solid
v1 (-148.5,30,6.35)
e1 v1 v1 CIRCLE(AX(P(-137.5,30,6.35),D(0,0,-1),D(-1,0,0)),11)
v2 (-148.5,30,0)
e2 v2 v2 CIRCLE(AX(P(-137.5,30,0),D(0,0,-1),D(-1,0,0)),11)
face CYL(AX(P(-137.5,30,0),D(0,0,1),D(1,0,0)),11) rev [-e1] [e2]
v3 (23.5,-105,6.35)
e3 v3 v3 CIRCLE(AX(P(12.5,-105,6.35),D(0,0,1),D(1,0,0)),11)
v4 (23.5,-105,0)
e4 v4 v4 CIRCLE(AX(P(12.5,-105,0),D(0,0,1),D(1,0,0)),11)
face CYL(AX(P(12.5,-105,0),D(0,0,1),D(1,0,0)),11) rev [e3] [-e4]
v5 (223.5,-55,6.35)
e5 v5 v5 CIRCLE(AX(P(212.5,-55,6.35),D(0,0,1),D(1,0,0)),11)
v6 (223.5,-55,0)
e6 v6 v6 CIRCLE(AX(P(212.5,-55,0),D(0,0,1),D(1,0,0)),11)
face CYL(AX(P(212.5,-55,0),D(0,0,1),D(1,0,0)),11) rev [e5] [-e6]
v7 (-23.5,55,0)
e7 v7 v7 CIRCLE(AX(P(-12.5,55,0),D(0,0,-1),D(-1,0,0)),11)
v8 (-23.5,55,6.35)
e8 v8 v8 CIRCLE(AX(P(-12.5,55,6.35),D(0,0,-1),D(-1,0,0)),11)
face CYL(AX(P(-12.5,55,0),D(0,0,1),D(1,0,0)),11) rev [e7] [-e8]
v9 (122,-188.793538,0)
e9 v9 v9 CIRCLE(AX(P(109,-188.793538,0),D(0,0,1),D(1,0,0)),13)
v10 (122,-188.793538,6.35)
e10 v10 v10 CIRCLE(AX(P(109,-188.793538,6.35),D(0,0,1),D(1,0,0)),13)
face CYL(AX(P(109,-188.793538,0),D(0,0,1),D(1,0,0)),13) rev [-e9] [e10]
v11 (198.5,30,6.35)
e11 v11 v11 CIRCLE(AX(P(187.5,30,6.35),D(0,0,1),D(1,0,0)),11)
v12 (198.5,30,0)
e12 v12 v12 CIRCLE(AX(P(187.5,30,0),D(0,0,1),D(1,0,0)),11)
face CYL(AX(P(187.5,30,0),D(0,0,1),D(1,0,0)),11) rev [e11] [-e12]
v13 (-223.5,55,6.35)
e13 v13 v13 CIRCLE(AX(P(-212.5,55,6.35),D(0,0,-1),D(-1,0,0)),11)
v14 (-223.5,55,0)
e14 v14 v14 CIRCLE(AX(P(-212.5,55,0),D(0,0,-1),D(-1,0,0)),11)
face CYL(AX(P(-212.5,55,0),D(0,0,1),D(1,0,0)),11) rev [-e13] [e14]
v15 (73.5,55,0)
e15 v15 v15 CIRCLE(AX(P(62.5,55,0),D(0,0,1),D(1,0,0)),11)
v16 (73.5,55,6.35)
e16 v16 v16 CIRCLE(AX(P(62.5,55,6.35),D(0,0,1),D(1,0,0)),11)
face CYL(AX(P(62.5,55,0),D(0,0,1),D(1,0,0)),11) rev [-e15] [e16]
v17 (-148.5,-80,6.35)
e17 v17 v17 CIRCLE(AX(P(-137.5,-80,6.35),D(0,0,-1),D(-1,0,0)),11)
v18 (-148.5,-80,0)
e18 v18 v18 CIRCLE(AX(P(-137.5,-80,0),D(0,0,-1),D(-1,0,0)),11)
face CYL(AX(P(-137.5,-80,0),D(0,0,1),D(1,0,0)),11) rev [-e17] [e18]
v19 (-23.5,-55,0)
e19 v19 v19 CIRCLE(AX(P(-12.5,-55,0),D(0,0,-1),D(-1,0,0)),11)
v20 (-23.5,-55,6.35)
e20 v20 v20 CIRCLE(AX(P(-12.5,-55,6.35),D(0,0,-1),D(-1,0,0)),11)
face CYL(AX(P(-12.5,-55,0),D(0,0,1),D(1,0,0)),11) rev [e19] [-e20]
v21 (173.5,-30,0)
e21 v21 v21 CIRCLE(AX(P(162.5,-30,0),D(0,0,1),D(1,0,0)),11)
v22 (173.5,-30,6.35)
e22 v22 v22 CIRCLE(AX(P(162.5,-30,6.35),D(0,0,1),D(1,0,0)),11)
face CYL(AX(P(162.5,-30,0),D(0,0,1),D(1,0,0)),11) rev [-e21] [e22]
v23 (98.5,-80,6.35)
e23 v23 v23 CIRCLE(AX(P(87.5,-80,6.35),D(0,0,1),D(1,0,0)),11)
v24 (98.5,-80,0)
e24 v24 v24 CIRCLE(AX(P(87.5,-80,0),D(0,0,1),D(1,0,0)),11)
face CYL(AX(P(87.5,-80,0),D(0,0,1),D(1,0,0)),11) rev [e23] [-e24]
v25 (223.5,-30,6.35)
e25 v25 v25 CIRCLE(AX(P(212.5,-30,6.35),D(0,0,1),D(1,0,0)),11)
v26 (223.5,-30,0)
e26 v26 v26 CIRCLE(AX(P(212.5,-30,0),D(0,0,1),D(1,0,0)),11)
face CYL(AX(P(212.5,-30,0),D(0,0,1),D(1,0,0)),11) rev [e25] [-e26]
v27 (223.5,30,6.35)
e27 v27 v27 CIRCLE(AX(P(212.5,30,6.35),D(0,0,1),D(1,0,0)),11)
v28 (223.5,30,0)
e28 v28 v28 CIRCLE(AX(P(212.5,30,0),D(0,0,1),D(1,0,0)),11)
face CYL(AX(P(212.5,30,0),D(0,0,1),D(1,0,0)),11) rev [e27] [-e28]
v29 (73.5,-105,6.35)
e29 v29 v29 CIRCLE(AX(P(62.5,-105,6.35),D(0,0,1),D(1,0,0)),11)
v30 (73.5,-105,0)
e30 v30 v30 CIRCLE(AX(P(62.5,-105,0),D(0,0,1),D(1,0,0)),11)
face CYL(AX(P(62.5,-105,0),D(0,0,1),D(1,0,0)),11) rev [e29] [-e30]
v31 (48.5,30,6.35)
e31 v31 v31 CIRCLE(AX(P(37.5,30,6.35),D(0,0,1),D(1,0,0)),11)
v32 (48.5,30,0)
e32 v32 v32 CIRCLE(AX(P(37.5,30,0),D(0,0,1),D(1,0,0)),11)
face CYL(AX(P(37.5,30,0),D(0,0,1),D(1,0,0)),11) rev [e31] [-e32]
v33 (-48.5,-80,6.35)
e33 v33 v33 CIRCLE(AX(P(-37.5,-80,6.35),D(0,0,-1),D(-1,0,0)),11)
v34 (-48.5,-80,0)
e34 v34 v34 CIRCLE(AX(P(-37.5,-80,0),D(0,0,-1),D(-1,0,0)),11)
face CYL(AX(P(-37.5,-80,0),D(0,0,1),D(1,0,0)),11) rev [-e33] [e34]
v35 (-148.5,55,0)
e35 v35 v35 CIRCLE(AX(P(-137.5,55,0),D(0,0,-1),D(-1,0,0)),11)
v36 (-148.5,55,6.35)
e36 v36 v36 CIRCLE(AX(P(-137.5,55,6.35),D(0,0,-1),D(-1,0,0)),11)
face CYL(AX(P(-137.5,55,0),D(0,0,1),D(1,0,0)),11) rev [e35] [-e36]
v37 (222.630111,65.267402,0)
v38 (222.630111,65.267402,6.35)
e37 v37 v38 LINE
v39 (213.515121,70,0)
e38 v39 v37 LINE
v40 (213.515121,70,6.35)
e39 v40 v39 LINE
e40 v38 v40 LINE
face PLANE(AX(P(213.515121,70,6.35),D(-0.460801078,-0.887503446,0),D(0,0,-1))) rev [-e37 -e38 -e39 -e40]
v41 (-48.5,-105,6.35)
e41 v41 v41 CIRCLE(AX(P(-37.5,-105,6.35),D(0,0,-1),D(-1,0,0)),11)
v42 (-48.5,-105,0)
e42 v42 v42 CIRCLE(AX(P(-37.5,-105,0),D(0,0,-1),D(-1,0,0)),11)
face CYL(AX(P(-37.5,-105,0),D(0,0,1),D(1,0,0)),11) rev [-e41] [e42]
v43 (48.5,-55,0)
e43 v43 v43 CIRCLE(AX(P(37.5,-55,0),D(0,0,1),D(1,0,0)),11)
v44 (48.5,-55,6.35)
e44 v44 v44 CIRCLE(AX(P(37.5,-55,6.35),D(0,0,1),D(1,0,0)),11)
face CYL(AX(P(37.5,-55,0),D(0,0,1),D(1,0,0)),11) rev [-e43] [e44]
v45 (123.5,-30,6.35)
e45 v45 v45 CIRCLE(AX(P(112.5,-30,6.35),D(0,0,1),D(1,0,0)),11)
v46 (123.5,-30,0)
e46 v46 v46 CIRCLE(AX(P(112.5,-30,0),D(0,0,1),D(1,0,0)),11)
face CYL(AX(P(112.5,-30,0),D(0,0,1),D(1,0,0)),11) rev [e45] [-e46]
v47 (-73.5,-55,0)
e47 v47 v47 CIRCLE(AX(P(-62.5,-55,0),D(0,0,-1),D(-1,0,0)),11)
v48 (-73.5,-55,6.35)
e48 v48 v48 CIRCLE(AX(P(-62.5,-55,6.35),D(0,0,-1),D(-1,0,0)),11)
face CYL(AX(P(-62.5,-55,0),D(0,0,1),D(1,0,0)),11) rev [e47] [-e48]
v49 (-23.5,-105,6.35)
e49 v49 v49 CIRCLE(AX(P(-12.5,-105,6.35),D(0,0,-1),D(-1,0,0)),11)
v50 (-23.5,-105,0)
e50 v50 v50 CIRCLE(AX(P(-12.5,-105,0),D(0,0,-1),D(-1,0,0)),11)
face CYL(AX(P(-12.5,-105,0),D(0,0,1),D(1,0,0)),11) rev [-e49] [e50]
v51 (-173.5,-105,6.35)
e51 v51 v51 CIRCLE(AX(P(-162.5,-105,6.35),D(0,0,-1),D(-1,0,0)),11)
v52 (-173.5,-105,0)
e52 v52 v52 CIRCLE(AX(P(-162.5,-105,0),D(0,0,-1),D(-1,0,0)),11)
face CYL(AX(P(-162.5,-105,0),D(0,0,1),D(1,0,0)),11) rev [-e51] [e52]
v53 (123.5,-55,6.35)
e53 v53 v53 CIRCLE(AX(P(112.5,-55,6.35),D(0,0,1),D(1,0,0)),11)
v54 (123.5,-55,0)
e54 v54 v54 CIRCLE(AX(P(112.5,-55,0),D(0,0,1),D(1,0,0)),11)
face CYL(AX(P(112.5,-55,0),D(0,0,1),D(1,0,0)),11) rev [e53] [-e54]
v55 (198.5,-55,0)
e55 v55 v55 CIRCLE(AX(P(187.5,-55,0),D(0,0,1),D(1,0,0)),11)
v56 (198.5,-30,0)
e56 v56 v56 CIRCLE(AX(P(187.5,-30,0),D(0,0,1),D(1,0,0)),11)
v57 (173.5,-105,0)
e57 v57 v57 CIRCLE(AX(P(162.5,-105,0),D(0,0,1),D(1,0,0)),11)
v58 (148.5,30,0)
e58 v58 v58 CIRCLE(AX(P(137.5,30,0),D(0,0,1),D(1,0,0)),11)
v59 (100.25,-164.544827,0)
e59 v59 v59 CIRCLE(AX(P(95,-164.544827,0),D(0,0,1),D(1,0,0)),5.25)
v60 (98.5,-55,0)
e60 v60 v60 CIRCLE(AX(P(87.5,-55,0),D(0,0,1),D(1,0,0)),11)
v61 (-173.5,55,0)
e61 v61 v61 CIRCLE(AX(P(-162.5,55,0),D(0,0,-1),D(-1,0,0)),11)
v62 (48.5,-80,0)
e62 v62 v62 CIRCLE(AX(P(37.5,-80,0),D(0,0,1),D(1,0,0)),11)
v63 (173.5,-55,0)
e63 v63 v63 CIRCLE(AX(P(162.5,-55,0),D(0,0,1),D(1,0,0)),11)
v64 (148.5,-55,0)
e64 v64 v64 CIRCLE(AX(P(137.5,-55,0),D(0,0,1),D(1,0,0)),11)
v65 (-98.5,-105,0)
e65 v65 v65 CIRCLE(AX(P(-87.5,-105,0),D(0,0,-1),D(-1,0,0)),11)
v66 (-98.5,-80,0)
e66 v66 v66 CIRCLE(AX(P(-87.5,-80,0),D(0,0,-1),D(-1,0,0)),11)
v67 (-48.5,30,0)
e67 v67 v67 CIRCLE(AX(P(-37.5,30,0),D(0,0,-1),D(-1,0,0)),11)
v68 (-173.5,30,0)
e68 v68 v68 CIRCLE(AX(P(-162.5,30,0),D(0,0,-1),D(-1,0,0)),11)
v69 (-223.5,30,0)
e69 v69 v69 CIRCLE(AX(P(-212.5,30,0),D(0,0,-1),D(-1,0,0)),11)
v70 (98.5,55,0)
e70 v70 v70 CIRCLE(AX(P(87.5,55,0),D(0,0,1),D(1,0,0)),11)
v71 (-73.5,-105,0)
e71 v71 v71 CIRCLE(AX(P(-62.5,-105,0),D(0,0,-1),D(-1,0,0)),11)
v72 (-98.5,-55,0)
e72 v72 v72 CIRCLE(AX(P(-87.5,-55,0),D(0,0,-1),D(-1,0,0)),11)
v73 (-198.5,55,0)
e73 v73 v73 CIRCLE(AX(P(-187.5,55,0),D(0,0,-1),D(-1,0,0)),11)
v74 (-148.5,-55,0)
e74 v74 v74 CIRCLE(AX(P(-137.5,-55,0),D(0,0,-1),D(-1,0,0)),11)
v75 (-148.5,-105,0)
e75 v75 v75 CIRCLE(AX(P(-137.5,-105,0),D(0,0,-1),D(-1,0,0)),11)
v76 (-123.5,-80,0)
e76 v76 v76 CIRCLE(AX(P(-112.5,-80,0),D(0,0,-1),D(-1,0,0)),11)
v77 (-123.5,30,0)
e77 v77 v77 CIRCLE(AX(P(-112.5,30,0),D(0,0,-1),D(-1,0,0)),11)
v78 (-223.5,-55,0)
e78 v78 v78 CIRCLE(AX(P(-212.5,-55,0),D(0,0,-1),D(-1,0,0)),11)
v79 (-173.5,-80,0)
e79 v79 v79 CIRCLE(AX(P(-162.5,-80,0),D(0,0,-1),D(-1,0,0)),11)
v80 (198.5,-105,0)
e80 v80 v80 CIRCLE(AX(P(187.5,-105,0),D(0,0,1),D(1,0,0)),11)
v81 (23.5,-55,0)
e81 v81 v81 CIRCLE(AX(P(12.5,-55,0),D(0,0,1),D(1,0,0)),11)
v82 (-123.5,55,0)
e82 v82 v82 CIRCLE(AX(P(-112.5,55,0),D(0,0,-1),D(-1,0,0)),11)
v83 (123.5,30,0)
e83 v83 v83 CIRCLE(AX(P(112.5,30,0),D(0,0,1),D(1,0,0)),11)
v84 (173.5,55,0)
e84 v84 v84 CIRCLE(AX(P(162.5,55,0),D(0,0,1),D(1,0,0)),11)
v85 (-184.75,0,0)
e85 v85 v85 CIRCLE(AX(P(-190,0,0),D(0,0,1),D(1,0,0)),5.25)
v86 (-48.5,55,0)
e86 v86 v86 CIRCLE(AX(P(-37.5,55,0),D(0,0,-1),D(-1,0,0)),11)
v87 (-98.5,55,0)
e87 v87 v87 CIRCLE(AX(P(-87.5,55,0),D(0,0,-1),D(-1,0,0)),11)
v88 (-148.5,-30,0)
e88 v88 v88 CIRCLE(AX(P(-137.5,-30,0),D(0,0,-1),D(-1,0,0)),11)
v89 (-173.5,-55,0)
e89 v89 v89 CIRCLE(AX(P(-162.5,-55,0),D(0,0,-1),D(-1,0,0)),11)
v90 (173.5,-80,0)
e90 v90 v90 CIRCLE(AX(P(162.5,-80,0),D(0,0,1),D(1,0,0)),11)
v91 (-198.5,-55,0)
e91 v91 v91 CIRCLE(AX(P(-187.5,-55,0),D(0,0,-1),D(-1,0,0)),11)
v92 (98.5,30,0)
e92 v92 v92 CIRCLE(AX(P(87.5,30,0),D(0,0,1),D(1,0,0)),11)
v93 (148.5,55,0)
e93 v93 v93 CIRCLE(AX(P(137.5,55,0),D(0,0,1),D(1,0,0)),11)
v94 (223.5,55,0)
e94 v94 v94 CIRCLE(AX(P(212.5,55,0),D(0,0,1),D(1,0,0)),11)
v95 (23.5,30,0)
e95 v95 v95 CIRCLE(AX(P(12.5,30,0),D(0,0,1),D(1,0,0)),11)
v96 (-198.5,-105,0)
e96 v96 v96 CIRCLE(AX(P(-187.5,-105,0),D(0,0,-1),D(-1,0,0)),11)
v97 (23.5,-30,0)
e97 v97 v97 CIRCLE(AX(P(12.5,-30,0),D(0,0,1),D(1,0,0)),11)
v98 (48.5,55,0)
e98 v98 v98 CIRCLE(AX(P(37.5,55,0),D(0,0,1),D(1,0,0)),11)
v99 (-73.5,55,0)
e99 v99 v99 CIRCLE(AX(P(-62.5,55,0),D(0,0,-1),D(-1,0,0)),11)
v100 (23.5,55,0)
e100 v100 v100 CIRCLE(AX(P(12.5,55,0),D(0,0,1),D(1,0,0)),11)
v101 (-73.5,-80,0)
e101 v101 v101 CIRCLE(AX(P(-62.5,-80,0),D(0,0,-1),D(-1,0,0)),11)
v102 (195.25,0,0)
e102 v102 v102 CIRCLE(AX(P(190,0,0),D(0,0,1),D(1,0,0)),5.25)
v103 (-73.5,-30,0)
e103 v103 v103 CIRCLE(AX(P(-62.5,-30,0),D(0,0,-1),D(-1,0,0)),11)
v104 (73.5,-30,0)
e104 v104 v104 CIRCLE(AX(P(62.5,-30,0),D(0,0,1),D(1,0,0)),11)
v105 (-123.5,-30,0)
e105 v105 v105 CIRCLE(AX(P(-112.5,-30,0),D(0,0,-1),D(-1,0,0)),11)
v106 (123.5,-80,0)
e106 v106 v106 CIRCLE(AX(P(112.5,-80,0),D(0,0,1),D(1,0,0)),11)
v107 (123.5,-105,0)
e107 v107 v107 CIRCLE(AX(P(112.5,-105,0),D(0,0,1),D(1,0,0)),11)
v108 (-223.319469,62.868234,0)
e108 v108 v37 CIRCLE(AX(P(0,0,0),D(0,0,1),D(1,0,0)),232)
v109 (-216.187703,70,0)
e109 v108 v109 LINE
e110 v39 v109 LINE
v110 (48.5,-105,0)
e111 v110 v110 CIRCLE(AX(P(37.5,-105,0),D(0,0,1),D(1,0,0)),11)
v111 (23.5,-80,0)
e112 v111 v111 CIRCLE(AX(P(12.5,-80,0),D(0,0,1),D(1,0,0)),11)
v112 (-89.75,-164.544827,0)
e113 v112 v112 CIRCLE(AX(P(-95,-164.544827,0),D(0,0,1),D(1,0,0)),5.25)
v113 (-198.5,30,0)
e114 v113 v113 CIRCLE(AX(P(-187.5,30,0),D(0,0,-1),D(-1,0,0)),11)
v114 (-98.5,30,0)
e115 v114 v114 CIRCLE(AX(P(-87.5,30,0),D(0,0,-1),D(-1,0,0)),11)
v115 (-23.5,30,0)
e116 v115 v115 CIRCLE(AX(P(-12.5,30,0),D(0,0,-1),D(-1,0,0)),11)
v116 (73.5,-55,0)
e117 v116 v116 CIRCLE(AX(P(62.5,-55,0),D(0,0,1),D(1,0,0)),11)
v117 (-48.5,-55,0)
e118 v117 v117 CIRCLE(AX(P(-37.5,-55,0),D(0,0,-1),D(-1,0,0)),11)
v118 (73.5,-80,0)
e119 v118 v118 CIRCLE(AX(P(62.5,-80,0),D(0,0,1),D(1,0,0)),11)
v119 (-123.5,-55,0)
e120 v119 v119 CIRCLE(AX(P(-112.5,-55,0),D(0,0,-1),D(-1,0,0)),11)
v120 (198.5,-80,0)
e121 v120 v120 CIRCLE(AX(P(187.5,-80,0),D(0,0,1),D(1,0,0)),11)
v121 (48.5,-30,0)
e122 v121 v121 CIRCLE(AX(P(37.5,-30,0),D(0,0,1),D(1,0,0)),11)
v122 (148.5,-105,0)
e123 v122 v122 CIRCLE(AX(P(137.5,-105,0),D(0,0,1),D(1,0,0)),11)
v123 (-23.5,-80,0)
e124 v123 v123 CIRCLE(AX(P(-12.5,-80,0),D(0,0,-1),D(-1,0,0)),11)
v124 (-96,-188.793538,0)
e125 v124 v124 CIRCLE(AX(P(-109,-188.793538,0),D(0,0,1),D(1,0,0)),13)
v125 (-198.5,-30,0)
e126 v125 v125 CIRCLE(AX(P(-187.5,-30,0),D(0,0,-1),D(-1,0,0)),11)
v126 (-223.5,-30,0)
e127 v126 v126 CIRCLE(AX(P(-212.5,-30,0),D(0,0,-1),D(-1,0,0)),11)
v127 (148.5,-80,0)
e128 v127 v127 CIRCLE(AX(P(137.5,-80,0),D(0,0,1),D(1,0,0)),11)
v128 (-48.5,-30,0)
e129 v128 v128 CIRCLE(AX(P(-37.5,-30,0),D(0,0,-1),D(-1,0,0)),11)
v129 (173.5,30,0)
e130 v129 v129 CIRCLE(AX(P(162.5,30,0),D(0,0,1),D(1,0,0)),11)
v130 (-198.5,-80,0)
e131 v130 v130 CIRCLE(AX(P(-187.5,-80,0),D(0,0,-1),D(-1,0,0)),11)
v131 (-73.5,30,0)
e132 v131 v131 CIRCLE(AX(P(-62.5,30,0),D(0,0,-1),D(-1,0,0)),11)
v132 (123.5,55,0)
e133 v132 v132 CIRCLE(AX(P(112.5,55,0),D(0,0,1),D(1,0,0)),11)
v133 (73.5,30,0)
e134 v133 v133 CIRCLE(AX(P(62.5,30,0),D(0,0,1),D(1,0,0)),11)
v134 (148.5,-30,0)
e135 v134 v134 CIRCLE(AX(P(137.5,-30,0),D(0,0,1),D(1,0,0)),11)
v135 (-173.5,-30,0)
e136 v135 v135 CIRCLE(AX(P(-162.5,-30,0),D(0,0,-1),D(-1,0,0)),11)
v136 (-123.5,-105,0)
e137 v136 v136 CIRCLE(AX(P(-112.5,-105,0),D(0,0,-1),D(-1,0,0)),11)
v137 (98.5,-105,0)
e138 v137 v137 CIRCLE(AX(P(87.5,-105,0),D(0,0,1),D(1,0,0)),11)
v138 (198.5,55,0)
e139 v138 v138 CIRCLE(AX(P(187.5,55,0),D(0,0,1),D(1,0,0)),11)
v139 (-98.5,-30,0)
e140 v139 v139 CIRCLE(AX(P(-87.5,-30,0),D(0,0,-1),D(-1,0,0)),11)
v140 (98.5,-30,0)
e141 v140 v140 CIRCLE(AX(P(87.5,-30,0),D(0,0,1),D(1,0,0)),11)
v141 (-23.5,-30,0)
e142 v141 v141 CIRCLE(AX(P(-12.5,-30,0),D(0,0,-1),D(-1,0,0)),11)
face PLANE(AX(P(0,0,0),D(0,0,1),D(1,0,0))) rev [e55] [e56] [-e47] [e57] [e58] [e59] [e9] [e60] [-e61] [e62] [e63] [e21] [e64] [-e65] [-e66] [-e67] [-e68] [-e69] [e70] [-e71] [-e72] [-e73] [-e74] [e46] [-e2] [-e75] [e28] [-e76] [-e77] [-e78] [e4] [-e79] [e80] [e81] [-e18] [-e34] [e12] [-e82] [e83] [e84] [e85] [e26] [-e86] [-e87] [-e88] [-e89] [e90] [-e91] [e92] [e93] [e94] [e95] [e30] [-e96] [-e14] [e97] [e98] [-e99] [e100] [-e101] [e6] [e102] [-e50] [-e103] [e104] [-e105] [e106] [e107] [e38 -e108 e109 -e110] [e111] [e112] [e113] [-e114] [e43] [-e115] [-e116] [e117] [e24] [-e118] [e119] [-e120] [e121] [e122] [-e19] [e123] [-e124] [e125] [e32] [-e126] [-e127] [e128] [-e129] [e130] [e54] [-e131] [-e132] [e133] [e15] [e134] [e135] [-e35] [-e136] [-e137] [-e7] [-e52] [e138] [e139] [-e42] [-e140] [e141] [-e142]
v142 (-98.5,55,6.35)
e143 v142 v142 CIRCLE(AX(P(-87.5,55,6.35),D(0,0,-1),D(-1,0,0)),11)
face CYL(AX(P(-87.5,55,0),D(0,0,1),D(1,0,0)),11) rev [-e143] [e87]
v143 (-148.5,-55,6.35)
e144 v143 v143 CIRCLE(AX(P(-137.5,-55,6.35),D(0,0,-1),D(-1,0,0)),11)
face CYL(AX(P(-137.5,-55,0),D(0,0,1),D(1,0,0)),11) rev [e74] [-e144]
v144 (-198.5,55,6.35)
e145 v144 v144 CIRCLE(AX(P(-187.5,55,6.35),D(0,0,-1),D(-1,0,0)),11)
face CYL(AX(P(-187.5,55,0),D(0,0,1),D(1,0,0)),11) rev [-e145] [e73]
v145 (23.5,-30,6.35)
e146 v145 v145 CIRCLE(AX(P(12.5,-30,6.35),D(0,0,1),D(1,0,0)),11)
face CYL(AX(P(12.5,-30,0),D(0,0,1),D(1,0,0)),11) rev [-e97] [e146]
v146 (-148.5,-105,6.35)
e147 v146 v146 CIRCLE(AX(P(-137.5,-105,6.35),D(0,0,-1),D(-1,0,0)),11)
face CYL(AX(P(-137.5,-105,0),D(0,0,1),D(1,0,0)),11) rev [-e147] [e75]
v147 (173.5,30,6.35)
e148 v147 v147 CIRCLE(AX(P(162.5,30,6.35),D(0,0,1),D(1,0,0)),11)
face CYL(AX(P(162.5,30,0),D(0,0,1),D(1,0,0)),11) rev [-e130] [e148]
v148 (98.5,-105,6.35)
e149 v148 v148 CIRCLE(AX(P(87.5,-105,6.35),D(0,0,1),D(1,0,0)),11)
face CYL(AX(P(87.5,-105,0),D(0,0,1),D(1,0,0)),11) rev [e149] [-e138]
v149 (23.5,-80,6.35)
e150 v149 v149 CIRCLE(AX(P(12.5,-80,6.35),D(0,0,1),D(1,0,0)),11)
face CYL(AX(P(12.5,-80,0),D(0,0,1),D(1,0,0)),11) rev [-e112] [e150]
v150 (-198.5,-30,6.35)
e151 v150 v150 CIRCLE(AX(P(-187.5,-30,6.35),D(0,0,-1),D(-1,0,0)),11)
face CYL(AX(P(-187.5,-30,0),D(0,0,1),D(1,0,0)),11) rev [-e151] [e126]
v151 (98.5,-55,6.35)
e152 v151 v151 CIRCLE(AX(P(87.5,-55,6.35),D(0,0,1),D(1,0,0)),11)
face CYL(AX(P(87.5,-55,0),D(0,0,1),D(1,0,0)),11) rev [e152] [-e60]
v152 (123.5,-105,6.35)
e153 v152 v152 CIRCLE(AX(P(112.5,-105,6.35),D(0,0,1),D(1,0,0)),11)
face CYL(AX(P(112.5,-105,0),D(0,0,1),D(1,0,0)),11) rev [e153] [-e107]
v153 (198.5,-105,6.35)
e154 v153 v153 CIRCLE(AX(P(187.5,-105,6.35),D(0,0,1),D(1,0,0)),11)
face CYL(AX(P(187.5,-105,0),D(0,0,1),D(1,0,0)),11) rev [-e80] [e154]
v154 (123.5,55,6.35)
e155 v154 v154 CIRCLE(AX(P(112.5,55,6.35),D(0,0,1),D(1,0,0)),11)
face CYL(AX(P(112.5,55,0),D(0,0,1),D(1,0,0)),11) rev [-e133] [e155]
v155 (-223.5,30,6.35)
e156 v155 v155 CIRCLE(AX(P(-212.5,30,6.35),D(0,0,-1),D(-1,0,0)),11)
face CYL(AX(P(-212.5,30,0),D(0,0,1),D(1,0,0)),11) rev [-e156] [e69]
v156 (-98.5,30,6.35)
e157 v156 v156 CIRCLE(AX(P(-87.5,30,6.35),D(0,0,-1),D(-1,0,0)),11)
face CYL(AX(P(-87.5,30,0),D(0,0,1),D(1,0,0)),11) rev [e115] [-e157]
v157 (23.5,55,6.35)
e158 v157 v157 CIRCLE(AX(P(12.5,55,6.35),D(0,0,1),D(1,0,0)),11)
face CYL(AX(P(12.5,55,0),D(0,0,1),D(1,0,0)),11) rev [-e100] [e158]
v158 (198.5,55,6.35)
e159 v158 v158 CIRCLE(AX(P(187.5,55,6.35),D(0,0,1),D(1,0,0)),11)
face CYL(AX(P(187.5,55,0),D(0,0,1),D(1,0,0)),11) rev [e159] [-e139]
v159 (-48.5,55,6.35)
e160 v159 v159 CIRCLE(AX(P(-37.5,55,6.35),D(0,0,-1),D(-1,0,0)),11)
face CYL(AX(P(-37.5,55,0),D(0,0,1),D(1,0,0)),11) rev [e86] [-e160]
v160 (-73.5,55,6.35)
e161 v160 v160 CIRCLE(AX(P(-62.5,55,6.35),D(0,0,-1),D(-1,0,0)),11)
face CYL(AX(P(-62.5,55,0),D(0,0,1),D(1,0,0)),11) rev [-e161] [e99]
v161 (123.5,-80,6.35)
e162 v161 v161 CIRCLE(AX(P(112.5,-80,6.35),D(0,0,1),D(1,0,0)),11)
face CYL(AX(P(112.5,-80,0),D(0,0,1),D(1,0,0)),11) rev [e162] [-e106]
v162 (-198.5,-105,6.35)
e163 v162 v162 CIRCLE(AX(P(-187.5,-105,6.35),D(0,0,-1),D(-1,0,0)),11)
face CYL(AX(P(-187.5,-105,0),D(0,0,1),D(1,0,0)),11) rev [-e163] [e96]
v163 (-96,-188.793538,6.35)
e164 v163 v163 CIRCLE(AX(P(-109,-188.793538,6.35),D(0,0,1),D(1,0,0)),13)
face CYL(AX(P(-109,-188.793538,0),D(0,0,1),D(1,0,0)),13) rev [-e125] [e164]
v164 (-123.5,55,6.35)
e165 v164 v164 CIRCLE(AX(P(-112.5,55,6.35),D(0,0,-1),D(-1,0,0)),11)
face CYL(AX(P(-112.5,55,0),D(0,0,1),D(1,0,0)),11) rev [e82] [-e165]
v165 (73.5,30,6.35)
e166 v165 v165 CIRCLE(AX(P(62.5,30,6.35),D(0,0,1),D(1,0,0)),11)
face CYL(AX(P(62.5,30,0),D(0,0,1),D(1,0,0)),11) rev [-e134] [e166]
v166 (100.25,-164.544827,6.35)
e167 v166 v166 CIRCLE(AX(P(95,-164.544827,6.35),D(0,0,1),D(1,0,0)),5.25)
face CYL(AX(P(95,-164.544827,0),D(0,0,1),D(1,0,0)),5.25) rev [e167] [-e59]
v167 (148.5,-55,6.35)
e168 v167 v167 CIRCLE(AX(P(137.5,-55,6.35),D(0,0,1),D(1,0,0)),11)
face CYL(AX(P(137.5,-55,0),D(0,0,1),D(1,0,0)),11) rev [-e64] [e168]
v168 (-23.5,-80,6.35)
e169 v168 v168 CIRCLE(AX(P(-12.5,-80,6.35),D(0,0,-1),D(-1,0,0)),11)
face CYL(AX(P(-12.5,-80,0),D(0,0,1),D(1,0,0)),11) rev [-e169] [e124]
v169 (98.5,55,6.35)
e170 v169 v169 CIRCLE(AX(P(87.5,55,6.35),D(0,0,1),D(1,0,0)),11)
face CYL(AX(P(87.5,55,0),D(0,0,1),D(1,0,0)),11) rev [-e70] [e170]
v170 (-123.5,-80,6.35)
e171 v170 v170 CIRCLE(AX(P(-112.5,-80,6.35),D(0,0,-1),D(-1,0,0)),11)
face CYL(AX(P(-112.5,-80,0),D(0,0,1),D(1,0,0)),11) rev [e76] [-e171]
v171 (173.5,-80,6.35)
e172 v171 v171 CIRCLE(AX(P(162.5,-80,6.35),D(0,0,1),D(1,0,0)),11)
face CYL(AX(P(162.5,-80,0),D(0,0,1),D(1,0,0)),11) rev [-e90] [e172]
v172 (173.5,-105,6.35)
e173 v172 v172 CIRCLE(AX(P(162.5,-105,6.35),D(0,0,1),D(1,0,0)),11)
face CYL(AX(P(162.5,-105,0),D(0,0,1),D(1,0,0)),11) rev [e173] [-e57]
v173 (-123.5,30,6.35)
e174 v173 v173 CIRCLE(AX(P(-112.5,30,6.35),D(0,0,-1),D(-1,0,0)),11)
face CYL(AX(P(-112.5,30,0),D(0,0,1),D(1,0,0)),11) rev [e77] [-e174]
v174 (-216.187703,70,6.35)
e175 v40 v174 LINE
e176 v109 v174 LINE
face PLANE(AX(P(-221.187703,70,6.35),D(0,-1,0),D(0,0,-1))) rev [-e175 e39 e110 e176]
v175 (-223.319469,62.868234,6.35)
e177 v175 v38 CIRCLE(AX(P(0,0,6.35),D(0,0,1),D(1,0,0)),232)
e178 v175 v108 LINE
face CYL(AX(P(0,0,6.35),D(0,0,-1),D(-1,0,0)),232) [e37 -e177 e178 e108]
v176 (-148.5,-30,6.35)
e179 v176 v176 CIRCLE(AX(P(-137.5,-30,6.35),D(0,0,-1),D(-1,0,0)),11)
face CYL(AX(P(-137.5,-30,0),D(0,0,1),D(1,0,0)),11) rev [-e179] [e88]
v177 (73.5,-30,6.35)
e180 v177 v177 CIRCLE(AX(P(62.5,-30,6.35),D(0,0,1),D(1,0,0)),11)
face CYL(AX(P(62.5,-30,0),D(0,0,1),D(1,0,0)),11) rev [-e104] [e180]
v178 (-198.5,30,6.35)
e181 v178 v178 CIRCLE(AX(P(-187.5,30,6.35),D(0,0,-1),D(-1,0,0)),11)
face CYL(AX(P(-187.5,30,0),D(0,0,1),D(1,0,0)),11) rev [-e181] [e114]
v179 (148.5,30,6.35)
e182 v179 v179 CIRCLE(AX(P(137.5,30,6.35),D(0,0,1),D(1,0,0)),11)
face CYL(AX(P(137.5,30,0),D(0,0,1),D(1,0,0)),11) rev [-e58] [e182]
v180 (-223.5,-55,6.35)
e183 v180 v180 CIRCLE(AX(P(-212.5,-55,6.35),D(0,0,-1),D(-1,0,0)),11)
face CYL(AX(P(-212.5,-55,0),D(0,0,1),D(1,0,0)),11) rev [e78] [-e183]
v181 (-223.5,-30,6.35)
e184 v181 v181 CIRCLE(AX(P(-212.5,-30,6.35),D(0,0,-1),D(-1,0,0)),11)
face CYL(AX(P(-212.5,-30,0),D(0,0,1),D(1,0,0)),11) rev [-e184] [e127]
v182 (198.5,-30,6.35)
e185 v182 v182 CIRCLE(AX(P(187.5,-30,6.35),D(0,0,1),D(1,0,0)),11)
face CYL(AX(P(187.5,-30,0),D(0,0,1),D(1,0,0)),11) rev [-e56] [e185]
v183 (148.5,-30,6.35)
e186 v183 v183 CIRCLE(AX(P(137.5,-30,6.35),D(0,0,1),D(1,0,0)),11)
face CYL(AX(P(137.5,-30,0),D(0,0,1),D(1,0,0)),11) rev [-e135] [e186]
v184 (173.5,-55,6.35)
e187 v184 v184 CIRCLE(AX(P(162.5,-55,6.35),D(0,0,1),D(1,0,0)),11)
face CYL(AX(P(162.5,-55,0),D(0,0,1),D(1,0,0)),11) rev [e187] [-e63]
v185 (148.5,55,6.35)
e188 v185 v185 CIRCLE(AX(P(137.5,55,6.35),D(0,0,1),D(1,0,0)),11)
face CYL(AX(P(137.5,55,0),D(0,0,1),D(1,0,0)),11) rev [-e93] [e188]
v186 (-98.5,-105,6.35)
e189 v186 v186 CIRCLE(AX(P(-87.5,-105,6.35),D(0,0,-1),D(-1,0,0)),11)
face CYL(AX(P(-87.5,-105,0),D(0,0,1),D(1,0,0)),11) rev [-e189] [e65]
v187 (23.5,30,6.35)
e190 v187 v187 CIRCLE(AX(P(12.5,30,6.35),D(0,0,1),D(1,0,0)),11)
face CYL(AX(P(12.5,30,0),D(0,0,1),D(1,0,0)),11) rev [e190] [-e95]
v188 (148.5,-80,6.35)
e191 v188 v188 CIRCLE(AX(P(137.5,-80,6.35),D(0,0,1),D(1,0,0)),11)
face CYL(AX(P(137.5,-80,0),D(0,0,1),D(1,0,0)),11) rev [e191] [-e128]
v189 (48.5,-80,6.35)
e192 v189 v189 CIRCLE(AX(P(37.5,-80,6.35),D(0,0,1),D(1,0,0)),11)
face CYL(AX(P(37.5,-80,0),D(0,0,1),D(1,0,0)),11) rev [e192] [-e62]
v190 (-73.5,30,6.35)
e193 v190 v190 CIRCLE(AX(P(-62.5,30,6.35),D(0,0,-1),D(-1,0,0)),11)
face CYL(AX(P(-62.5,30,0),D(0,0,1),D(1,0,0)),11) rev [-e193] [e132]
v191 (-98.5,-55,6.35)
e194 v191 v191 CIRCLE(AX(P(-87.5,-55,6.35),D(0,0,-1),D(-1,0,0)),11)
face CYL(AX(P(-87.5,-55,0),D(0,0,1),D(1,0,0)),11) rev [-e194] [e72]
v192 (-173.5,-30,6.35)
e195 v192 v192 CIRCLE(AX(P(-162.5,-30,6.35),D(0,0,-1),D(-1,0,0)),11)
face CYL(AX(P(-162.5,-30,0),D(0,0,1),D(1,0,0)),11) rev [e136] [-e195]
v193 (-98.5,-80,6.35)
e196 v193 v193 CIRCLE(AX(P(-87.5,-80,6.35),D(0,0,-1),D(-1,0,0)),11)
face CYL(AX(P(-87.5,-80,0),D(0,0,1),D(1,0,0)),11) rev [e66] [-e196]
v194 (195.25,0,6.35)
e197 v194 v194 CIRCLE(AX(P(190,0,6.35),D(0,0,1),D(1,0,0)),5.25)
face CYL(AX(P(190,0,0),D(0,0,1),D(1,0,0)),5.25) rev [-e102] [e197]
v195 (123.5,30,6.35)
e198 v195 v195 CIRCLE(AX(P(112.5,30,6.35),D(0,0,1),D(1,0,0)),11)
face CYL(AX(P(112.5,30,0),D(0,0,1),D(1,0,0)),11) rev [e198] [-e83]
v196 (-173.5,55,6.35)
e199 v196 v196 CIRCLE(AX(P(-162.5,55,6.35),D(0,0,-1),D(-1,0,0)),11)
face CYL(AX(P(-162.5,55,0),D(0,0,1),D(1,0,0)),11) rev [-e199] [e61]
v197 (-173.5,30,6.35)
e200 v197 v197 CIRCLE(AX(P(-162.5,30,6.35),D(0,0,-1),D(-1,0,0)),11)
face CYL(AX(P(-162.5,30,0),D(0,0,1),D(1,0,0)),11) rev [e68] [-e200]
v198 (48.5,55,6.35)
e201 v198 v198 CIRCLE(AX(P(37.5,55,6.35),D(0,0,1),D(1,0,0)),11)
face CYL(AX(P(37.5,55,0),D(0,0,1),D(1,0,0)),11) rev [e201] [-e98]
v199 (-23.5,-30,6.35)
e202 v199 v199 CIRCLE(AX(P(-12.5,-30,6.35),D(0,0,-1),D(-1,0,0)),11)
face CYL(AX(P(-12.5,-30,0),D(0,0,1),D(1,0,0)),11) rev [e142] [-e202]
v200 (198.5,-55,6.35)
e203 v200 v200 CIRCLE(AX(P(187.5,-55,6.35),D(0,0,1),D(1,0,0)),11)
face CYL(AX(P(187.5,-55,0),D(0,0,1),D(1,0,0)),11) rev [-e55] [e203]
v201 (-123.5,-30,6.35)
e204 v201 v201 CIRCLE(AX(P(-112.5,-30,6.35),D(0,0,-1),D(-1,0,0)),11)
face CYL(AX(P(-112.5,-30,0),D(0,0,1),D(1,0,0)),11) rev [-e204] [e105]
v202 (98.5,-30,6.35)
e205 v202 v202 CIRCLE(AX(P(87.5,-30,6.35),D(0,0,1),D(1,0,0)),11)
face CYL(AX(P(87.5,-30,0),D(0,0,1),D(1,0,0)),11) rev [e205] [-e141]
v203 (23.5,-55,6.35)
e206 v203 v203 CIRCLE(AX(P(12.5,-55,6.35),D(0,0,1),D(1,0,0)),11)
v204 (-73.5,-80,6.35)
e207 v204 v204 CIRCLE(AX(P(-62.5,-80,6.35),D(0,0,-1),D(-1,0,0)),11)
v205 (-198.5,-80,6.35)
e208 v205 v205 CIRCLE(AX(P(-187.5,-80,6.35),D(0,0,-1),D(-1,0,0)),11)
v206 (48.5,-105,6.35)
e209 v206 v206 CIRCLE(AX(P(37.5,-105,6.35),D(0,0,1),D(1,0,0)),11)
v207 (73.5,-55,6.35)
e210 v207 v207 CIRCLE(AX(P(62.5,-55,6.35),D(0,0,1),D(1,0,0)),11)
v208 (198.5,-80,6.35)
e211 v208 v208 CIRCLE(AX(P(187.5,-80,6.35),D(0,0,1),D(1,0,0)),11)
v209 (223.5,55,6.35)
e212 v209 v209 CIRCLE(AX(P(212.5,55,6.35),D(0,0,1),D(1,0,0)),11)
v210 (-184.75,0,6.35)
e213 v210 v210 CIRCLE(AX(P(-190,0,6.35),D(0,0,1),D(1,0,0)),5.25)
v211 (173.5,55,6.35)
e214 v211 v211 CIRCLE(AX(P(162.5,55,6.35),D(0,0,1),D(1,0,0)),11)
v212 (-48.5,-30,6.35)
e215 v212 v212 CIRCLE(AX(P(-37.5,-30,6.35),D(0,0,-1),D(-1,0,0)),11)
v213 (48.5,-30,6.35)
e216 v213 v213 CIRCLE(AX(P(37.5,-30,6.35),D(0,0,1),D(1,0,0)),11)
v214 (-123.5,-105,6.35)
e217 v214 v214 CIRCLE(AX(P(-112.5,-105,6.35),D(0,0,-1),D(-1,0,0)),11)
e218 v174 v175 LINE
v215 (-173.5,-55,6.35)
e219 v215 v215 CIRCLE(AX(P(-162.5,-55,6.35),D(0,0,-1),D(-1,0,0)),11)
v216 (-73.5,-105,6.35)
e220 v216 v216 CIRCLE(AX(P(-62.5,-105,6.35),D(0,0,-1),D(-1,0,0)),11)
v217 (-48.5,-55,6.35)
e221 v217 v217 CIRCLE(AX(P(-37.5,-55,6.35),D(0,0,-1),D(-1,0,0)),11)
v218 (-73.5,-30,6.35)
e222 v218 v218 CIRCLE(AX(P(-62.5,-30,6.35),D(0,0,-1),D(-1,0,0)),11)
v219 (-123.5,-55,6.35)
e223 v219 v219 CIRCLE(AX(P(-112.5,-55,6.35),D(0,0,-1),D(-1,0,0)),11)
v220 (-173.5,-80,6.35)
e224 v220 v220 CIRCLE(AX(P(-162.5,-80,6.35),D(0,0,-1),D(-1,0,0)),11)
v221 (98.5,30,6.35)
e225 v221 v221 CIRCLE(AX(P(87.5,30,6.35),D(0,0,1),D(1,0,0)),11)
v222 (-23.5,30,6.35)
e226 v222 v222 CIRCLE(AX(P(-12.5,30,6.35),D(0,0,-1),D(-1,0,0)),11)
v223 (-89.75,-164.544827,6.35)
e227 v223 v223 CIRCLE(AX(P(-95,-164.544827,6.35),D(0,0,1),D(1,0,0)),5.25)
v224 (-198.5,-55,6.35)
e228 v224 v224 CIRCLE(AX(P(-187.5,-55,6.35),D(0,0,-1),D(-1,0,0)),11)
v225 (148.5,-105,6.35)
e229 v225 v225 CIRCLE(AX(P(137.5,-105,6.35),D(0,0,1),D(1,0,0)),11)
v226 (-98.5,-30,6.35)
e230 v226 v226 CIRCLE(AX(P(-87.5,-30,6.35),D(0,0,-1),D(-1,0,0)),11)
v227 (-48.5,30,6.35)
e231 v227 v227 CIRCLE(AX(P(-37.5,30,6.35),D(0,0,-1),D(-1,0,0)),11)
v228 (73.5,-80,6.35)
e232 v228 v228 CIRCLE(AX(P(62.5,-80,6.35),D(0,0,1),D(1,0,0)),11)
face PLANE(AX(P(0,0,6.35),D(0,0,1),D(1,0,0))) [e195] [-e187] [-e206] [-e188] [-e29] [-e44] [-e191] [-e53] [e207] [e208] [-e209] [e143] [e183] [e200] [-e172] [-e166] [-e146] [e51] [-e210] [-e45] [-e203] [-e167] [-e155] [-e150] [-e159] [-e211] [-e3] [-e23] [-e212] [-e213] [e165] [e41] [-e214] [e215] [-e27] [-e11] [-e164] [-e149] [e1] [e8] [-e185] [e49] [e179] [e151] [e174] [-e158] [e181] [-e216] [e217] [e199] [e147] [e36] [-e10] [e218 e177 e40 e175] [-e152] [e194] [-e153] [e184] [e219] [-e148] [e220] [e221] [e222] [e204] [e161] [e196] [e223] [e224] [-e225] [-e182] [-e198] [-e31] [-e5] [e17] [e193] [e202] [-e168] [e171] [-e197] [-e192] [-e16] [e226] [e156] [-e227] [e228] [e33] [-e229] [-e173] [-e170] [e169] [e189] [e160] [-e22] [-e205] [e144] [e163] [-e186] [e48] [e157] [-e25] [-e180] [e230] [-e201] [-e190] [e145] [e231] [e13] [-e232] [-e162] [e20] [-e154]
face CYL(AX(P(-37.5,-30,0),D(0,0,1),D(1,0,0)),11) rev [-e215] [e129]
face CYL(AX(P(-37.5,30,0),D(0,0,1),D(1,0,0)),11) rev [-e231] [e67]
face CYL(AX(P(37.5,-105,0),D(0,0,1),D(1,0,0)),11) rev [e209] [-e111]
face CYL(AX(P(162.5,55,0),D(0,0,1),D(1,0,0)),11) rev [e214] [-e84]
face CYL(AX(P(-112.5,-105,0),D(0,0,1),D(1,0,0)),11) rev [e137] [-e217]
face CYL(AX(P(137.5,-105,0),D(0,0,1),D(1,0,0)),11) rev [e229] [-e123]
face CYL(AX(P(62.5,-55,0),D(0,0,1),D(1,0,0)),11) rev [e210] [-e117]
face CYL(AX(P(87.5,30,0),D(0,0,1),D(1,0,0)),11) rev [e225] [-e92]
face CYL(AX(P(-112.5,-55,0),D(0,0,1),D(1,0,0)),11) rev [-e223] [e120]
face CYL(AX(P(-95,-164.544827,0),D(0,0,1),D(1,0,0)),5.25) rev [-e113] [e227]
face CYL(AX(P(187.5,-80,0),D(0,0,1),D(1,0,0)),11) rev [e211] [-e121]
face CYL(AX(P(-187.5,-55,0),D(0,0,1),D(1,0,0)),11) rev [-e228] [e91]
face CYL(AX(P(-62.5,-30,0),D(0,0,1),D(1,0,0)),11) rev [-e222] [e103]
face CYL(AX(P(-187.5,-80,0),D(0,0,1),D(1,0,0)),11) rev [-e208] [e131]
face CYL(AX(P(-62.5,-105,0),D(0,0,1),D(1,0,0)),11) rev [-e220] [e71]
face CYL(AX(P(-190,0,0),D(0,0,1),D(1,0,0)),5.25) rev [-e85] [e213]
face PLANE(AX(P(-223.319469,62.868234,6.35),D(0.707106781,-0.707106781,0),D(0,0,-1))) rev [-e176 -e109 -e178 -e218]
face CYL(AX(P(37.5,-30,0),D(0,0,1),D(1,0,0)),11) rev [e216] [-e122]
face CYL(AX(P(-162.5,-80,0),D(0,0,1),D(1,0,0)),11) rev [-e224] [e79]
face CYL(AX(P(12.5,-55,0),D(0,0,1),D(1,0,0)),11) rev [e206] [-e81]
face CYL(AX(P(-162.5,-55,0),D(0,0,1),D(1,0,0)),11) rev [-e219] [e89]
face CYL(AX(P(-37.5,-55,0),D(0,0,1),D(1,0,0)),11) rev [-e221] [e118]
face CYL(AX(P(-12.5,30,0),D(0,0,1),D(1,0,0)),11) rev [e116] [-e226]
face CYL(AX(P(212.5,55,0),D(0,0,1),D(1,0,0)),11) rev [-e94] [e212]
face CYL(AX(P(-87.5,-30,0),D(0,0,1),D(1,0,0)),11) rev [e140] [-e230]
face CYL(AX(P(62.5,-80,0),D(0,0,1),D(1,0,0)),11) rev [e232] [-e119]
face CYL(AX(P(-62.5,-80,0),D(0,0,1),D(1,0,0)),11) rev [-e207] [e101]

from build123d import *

# Parameters (mm, degrees)
BOSS_EXTRUDE1_DEPTH = 6.35
CHAMFER1_SIZE       = 5
CHAMFER1_SIZE_2     = 7.672581673
SKETCH2_R           = 5.25
CUT_EXTRUDE1_DEPTH  = 329.158989668
SKETCH3_R           = 11
CUT_EXTRUDE2_DEPTH  = 329.158989668
SKETCH4_R           = 13
CUT_EXTRUDE3_DEPTH  = 329.158989668


with BuildPart() as part:
    # Sketch1 → Boss-Extrude1 (new body)
    with BuildSketch(Plane.XY):
        with BuildLine():
            Line((-221.187703094, 70), (221.187703094, 70))
            ThreePointArc((221.187703094, 70), (0, -232), (-221.187703094, 70))
        make_face()
    extrude(amount=BOSS_EXTRUDE1_DEPTH)

    # Chamfer1
    # the kernel refuses this chamfer: 7.672581673, 5 mm, written as the material it takes off along each edge
    with BuildSketch(Plane(origin=(-221.187703094, 70, -19.287514673), x_dir=(1, 0, 0), z_dir=(0, 0, 1))) as chamfer1_piece_1:
        with BuildLine():
            Line((CHAMFER1_SIZE, 0), (-2.131765618, -7.131765618))
            ThreePointArc((-2.131765618, -7.131765618), (-1.133115382, -3.68670064), (0, 0))
            Line((0, 0), (CHAMFER1_SIZE, 0))
        make_face()
    extrude(amount=44.925029345, mode=Mode.SUBTRACT)
    with BuildSketch(Plane(origin=(221.187703094, 70, -19.865544851), x_dir=(-1, 0, 0), z_dir=(0, 0, 1))) as chamfer1_piece_2:
        with BuildLine():
            Line((CHAMFER1_SIZE_2, 0), (-1.44240767, 4.732597867))
            ThreePointArc((-1.44240767, 4.732597867), (-0.765078162, 2.465098705), (0, 0))
            Line((0, 0), (CHAMFER1_SIZE_2, 0))
        make_face()
    extrude(amount=46.081089702, mode=Mode.SUBTRACT)

    # Sketch2 → Cut-Extrude1 (cut, through all)
    with BuildSketch(Plane.XY.offset(6.35)):
        with Locations((-190, 0)):
            Circle(SKETCH2_R)
        with Locations((190, 0)):
            Circle(SKETCH2_R)
        with Locations((95, -164.544826719)):
            Circle(SKETCH2_R)
        with Locations((-95, -164.544826719)):
            Circle(SKETCH2_R)
    extrude(amount=-CUT_EXTRUDE1_DEPTH, mode=Mode.SUBTRACT)

    # Sketch3 → Cut-Extrude2 (cut, through all)
    with BuildSketch(Plane.XY.offset(6.35)):
        with Locations((12.5, -30)):
            Circle(SKETCH3_R)
        with Locations((12.5, -55)):
            Circle(SKETCH3_R)
        with Locations((12.5, -80)):
            Circle(SKETCH3_R)
        with Locations((12.5, -105)):
            Circle(SKETCH3_R)
        with Locations((37.5, -30)):
            Circle(SKETCH3_R)
        with Locations((37.5, -55)):
            Circle(SKETCH3_R)
        with Locations((62.5, -30)):
            Circle(SKETCH3_R)
        with Locations((62.5, -55)):
            Circle(SKETCH3_R)
        with Locations((87.5, -30)):
            Circle(SKETCH3_R)
        with Locations((87.5, -55)):
            Circle(SKETCH3_R)
        with Locations((112.5, -30)):
            Circle(SKETCH3_R)
        with Locations((112.5, -55)):
            Circle(SKETCH3_R)
        with Locations((137.5, -30)):
            Circle(SKETCH3_R)
        with Locations((137.5, -55)):
            Circle(SKETCH3_R)
        with Locations((162.5, -30)):
            Circle(SKETCH3_R)
        with Locations((162.5, -55)):
            Circle(SKETCH3_R)
        with Locations((187.5, -30)):
            Circle(SKETCH3_R)
        with Locations((187.5, -55)):
            Circle(SKETCH3_R)
        with Locations((212.5, -30)):
            Circle(SKETCH3_R)
        with Locations((212.5, -55)):
            Circle(SKETCH3_R)
        with Locations((37.5, -80)):
            Circle(SKETCH3_R)
        with Locations((37.5, -105)):
            Circle(SKETCH3_R)
        with Locations((62.5, -80)):
            Circle(SKETCH3_R)
        with Locations((62.5, -105)):
            Circle(SKETCH3_R)
        with Locations((87.5, -80)):
            Circle(SKETCH3_R)
        with Locations((87.5, -105)):
            Circle(SKETCH3_R)
        with Locations((112.5, -80)):
            Circle(SKETCH3_R)
        with Locations((112.5, -105)):
            Circle(SKETCH3_R)
        with Locations((137.5, -80)):
            Circle(SKETCH3_R)
        with Locations((137.5, -105)):
            Circle(SKETCH3_R)
        with Locations((162.5, -80)):
            Circle(SKETCH3_R)
        with Locations((162.5, -105)):
            Circle(SKETCH3_R)
        with Locations((187.5, -80)):
            Circle(SKETCH3_R)
        with Locations((187.5, -105)):
            Circle(SKETCH3_R)
        with Locations((12.5, 30)):
            Circle(SKETCH3_R)
        with Locations((12.5, 55)):
            Circle(SKETCH3_R)
        with Locations((37.5, 55)):
            Circle(SKETCH3_R)
        with Locations((37.5, 30)):
            Circle(SKETCH3_R)
        with Locations((62.5, 55)):
            Circle(SKETCH3_R)
        with Locations((62.5, 30)):
            Circle(SKETCH3_R)
        with Locations((87.5, 55)):
            Circle(SKETCH3_R)
        with Locations((87.5, 30)):
            Circle(SKETCH3_R)
        with Locations((112.5, 55)):
            Circle(SKETCH3_R)
        with Locations((112.5, 30)):
            Circle(SKETCH3_R)
        with Locations((137.5, 55)):
            Circle(SKETCH3_R)
        with Locations((137.5, 30)):
            Circle(SKETCH3_R)
        with Locations((162.5, 55)):
            Circle(SKETCH3_R)
        with Locations((162.5, 30)):
            Circle(SKETCH3_R)
        with Locations((187.5, 55)):
            Circle(SKETCH3_R)
        with Locations((187.5, 30)):
            Circle(SKETCH3_R)
        with Locations((212.5, 55)):
            Circle(SKETCH3_R)
        with Locations((212.5, 30)):
            Circle(SKETCH3_R)
    cut_extrude2 = extrude(amount=-CUT_EXTRUDE2_DEPTH, mode=Mode.SUBTRACT)

    # Mirror2: Cut-Extrude2 across plane
    add(cut_extrude2.mirror(Plane(origin=(0, 0, 0), x_dir=(0, 0, 1), z_dir=(1, 0, 0))), mode=Mode.SUBTRACT)

    # Sketch4 → Cut-Extrude3 (cut, through all)
    with BuildSketch(Plane.XY.offset(6.35)):
        with Locations((-109, -188.793538025)):
            Circle(SKETCH4_R)
        with Locations((109, -188.793538025)):
            Circle(SKETCH4_R)
    extrude(amount=-CUT_EXTRUDE3_DEPTH, mode=Mode.SUBTRACT)


solid = part.part
